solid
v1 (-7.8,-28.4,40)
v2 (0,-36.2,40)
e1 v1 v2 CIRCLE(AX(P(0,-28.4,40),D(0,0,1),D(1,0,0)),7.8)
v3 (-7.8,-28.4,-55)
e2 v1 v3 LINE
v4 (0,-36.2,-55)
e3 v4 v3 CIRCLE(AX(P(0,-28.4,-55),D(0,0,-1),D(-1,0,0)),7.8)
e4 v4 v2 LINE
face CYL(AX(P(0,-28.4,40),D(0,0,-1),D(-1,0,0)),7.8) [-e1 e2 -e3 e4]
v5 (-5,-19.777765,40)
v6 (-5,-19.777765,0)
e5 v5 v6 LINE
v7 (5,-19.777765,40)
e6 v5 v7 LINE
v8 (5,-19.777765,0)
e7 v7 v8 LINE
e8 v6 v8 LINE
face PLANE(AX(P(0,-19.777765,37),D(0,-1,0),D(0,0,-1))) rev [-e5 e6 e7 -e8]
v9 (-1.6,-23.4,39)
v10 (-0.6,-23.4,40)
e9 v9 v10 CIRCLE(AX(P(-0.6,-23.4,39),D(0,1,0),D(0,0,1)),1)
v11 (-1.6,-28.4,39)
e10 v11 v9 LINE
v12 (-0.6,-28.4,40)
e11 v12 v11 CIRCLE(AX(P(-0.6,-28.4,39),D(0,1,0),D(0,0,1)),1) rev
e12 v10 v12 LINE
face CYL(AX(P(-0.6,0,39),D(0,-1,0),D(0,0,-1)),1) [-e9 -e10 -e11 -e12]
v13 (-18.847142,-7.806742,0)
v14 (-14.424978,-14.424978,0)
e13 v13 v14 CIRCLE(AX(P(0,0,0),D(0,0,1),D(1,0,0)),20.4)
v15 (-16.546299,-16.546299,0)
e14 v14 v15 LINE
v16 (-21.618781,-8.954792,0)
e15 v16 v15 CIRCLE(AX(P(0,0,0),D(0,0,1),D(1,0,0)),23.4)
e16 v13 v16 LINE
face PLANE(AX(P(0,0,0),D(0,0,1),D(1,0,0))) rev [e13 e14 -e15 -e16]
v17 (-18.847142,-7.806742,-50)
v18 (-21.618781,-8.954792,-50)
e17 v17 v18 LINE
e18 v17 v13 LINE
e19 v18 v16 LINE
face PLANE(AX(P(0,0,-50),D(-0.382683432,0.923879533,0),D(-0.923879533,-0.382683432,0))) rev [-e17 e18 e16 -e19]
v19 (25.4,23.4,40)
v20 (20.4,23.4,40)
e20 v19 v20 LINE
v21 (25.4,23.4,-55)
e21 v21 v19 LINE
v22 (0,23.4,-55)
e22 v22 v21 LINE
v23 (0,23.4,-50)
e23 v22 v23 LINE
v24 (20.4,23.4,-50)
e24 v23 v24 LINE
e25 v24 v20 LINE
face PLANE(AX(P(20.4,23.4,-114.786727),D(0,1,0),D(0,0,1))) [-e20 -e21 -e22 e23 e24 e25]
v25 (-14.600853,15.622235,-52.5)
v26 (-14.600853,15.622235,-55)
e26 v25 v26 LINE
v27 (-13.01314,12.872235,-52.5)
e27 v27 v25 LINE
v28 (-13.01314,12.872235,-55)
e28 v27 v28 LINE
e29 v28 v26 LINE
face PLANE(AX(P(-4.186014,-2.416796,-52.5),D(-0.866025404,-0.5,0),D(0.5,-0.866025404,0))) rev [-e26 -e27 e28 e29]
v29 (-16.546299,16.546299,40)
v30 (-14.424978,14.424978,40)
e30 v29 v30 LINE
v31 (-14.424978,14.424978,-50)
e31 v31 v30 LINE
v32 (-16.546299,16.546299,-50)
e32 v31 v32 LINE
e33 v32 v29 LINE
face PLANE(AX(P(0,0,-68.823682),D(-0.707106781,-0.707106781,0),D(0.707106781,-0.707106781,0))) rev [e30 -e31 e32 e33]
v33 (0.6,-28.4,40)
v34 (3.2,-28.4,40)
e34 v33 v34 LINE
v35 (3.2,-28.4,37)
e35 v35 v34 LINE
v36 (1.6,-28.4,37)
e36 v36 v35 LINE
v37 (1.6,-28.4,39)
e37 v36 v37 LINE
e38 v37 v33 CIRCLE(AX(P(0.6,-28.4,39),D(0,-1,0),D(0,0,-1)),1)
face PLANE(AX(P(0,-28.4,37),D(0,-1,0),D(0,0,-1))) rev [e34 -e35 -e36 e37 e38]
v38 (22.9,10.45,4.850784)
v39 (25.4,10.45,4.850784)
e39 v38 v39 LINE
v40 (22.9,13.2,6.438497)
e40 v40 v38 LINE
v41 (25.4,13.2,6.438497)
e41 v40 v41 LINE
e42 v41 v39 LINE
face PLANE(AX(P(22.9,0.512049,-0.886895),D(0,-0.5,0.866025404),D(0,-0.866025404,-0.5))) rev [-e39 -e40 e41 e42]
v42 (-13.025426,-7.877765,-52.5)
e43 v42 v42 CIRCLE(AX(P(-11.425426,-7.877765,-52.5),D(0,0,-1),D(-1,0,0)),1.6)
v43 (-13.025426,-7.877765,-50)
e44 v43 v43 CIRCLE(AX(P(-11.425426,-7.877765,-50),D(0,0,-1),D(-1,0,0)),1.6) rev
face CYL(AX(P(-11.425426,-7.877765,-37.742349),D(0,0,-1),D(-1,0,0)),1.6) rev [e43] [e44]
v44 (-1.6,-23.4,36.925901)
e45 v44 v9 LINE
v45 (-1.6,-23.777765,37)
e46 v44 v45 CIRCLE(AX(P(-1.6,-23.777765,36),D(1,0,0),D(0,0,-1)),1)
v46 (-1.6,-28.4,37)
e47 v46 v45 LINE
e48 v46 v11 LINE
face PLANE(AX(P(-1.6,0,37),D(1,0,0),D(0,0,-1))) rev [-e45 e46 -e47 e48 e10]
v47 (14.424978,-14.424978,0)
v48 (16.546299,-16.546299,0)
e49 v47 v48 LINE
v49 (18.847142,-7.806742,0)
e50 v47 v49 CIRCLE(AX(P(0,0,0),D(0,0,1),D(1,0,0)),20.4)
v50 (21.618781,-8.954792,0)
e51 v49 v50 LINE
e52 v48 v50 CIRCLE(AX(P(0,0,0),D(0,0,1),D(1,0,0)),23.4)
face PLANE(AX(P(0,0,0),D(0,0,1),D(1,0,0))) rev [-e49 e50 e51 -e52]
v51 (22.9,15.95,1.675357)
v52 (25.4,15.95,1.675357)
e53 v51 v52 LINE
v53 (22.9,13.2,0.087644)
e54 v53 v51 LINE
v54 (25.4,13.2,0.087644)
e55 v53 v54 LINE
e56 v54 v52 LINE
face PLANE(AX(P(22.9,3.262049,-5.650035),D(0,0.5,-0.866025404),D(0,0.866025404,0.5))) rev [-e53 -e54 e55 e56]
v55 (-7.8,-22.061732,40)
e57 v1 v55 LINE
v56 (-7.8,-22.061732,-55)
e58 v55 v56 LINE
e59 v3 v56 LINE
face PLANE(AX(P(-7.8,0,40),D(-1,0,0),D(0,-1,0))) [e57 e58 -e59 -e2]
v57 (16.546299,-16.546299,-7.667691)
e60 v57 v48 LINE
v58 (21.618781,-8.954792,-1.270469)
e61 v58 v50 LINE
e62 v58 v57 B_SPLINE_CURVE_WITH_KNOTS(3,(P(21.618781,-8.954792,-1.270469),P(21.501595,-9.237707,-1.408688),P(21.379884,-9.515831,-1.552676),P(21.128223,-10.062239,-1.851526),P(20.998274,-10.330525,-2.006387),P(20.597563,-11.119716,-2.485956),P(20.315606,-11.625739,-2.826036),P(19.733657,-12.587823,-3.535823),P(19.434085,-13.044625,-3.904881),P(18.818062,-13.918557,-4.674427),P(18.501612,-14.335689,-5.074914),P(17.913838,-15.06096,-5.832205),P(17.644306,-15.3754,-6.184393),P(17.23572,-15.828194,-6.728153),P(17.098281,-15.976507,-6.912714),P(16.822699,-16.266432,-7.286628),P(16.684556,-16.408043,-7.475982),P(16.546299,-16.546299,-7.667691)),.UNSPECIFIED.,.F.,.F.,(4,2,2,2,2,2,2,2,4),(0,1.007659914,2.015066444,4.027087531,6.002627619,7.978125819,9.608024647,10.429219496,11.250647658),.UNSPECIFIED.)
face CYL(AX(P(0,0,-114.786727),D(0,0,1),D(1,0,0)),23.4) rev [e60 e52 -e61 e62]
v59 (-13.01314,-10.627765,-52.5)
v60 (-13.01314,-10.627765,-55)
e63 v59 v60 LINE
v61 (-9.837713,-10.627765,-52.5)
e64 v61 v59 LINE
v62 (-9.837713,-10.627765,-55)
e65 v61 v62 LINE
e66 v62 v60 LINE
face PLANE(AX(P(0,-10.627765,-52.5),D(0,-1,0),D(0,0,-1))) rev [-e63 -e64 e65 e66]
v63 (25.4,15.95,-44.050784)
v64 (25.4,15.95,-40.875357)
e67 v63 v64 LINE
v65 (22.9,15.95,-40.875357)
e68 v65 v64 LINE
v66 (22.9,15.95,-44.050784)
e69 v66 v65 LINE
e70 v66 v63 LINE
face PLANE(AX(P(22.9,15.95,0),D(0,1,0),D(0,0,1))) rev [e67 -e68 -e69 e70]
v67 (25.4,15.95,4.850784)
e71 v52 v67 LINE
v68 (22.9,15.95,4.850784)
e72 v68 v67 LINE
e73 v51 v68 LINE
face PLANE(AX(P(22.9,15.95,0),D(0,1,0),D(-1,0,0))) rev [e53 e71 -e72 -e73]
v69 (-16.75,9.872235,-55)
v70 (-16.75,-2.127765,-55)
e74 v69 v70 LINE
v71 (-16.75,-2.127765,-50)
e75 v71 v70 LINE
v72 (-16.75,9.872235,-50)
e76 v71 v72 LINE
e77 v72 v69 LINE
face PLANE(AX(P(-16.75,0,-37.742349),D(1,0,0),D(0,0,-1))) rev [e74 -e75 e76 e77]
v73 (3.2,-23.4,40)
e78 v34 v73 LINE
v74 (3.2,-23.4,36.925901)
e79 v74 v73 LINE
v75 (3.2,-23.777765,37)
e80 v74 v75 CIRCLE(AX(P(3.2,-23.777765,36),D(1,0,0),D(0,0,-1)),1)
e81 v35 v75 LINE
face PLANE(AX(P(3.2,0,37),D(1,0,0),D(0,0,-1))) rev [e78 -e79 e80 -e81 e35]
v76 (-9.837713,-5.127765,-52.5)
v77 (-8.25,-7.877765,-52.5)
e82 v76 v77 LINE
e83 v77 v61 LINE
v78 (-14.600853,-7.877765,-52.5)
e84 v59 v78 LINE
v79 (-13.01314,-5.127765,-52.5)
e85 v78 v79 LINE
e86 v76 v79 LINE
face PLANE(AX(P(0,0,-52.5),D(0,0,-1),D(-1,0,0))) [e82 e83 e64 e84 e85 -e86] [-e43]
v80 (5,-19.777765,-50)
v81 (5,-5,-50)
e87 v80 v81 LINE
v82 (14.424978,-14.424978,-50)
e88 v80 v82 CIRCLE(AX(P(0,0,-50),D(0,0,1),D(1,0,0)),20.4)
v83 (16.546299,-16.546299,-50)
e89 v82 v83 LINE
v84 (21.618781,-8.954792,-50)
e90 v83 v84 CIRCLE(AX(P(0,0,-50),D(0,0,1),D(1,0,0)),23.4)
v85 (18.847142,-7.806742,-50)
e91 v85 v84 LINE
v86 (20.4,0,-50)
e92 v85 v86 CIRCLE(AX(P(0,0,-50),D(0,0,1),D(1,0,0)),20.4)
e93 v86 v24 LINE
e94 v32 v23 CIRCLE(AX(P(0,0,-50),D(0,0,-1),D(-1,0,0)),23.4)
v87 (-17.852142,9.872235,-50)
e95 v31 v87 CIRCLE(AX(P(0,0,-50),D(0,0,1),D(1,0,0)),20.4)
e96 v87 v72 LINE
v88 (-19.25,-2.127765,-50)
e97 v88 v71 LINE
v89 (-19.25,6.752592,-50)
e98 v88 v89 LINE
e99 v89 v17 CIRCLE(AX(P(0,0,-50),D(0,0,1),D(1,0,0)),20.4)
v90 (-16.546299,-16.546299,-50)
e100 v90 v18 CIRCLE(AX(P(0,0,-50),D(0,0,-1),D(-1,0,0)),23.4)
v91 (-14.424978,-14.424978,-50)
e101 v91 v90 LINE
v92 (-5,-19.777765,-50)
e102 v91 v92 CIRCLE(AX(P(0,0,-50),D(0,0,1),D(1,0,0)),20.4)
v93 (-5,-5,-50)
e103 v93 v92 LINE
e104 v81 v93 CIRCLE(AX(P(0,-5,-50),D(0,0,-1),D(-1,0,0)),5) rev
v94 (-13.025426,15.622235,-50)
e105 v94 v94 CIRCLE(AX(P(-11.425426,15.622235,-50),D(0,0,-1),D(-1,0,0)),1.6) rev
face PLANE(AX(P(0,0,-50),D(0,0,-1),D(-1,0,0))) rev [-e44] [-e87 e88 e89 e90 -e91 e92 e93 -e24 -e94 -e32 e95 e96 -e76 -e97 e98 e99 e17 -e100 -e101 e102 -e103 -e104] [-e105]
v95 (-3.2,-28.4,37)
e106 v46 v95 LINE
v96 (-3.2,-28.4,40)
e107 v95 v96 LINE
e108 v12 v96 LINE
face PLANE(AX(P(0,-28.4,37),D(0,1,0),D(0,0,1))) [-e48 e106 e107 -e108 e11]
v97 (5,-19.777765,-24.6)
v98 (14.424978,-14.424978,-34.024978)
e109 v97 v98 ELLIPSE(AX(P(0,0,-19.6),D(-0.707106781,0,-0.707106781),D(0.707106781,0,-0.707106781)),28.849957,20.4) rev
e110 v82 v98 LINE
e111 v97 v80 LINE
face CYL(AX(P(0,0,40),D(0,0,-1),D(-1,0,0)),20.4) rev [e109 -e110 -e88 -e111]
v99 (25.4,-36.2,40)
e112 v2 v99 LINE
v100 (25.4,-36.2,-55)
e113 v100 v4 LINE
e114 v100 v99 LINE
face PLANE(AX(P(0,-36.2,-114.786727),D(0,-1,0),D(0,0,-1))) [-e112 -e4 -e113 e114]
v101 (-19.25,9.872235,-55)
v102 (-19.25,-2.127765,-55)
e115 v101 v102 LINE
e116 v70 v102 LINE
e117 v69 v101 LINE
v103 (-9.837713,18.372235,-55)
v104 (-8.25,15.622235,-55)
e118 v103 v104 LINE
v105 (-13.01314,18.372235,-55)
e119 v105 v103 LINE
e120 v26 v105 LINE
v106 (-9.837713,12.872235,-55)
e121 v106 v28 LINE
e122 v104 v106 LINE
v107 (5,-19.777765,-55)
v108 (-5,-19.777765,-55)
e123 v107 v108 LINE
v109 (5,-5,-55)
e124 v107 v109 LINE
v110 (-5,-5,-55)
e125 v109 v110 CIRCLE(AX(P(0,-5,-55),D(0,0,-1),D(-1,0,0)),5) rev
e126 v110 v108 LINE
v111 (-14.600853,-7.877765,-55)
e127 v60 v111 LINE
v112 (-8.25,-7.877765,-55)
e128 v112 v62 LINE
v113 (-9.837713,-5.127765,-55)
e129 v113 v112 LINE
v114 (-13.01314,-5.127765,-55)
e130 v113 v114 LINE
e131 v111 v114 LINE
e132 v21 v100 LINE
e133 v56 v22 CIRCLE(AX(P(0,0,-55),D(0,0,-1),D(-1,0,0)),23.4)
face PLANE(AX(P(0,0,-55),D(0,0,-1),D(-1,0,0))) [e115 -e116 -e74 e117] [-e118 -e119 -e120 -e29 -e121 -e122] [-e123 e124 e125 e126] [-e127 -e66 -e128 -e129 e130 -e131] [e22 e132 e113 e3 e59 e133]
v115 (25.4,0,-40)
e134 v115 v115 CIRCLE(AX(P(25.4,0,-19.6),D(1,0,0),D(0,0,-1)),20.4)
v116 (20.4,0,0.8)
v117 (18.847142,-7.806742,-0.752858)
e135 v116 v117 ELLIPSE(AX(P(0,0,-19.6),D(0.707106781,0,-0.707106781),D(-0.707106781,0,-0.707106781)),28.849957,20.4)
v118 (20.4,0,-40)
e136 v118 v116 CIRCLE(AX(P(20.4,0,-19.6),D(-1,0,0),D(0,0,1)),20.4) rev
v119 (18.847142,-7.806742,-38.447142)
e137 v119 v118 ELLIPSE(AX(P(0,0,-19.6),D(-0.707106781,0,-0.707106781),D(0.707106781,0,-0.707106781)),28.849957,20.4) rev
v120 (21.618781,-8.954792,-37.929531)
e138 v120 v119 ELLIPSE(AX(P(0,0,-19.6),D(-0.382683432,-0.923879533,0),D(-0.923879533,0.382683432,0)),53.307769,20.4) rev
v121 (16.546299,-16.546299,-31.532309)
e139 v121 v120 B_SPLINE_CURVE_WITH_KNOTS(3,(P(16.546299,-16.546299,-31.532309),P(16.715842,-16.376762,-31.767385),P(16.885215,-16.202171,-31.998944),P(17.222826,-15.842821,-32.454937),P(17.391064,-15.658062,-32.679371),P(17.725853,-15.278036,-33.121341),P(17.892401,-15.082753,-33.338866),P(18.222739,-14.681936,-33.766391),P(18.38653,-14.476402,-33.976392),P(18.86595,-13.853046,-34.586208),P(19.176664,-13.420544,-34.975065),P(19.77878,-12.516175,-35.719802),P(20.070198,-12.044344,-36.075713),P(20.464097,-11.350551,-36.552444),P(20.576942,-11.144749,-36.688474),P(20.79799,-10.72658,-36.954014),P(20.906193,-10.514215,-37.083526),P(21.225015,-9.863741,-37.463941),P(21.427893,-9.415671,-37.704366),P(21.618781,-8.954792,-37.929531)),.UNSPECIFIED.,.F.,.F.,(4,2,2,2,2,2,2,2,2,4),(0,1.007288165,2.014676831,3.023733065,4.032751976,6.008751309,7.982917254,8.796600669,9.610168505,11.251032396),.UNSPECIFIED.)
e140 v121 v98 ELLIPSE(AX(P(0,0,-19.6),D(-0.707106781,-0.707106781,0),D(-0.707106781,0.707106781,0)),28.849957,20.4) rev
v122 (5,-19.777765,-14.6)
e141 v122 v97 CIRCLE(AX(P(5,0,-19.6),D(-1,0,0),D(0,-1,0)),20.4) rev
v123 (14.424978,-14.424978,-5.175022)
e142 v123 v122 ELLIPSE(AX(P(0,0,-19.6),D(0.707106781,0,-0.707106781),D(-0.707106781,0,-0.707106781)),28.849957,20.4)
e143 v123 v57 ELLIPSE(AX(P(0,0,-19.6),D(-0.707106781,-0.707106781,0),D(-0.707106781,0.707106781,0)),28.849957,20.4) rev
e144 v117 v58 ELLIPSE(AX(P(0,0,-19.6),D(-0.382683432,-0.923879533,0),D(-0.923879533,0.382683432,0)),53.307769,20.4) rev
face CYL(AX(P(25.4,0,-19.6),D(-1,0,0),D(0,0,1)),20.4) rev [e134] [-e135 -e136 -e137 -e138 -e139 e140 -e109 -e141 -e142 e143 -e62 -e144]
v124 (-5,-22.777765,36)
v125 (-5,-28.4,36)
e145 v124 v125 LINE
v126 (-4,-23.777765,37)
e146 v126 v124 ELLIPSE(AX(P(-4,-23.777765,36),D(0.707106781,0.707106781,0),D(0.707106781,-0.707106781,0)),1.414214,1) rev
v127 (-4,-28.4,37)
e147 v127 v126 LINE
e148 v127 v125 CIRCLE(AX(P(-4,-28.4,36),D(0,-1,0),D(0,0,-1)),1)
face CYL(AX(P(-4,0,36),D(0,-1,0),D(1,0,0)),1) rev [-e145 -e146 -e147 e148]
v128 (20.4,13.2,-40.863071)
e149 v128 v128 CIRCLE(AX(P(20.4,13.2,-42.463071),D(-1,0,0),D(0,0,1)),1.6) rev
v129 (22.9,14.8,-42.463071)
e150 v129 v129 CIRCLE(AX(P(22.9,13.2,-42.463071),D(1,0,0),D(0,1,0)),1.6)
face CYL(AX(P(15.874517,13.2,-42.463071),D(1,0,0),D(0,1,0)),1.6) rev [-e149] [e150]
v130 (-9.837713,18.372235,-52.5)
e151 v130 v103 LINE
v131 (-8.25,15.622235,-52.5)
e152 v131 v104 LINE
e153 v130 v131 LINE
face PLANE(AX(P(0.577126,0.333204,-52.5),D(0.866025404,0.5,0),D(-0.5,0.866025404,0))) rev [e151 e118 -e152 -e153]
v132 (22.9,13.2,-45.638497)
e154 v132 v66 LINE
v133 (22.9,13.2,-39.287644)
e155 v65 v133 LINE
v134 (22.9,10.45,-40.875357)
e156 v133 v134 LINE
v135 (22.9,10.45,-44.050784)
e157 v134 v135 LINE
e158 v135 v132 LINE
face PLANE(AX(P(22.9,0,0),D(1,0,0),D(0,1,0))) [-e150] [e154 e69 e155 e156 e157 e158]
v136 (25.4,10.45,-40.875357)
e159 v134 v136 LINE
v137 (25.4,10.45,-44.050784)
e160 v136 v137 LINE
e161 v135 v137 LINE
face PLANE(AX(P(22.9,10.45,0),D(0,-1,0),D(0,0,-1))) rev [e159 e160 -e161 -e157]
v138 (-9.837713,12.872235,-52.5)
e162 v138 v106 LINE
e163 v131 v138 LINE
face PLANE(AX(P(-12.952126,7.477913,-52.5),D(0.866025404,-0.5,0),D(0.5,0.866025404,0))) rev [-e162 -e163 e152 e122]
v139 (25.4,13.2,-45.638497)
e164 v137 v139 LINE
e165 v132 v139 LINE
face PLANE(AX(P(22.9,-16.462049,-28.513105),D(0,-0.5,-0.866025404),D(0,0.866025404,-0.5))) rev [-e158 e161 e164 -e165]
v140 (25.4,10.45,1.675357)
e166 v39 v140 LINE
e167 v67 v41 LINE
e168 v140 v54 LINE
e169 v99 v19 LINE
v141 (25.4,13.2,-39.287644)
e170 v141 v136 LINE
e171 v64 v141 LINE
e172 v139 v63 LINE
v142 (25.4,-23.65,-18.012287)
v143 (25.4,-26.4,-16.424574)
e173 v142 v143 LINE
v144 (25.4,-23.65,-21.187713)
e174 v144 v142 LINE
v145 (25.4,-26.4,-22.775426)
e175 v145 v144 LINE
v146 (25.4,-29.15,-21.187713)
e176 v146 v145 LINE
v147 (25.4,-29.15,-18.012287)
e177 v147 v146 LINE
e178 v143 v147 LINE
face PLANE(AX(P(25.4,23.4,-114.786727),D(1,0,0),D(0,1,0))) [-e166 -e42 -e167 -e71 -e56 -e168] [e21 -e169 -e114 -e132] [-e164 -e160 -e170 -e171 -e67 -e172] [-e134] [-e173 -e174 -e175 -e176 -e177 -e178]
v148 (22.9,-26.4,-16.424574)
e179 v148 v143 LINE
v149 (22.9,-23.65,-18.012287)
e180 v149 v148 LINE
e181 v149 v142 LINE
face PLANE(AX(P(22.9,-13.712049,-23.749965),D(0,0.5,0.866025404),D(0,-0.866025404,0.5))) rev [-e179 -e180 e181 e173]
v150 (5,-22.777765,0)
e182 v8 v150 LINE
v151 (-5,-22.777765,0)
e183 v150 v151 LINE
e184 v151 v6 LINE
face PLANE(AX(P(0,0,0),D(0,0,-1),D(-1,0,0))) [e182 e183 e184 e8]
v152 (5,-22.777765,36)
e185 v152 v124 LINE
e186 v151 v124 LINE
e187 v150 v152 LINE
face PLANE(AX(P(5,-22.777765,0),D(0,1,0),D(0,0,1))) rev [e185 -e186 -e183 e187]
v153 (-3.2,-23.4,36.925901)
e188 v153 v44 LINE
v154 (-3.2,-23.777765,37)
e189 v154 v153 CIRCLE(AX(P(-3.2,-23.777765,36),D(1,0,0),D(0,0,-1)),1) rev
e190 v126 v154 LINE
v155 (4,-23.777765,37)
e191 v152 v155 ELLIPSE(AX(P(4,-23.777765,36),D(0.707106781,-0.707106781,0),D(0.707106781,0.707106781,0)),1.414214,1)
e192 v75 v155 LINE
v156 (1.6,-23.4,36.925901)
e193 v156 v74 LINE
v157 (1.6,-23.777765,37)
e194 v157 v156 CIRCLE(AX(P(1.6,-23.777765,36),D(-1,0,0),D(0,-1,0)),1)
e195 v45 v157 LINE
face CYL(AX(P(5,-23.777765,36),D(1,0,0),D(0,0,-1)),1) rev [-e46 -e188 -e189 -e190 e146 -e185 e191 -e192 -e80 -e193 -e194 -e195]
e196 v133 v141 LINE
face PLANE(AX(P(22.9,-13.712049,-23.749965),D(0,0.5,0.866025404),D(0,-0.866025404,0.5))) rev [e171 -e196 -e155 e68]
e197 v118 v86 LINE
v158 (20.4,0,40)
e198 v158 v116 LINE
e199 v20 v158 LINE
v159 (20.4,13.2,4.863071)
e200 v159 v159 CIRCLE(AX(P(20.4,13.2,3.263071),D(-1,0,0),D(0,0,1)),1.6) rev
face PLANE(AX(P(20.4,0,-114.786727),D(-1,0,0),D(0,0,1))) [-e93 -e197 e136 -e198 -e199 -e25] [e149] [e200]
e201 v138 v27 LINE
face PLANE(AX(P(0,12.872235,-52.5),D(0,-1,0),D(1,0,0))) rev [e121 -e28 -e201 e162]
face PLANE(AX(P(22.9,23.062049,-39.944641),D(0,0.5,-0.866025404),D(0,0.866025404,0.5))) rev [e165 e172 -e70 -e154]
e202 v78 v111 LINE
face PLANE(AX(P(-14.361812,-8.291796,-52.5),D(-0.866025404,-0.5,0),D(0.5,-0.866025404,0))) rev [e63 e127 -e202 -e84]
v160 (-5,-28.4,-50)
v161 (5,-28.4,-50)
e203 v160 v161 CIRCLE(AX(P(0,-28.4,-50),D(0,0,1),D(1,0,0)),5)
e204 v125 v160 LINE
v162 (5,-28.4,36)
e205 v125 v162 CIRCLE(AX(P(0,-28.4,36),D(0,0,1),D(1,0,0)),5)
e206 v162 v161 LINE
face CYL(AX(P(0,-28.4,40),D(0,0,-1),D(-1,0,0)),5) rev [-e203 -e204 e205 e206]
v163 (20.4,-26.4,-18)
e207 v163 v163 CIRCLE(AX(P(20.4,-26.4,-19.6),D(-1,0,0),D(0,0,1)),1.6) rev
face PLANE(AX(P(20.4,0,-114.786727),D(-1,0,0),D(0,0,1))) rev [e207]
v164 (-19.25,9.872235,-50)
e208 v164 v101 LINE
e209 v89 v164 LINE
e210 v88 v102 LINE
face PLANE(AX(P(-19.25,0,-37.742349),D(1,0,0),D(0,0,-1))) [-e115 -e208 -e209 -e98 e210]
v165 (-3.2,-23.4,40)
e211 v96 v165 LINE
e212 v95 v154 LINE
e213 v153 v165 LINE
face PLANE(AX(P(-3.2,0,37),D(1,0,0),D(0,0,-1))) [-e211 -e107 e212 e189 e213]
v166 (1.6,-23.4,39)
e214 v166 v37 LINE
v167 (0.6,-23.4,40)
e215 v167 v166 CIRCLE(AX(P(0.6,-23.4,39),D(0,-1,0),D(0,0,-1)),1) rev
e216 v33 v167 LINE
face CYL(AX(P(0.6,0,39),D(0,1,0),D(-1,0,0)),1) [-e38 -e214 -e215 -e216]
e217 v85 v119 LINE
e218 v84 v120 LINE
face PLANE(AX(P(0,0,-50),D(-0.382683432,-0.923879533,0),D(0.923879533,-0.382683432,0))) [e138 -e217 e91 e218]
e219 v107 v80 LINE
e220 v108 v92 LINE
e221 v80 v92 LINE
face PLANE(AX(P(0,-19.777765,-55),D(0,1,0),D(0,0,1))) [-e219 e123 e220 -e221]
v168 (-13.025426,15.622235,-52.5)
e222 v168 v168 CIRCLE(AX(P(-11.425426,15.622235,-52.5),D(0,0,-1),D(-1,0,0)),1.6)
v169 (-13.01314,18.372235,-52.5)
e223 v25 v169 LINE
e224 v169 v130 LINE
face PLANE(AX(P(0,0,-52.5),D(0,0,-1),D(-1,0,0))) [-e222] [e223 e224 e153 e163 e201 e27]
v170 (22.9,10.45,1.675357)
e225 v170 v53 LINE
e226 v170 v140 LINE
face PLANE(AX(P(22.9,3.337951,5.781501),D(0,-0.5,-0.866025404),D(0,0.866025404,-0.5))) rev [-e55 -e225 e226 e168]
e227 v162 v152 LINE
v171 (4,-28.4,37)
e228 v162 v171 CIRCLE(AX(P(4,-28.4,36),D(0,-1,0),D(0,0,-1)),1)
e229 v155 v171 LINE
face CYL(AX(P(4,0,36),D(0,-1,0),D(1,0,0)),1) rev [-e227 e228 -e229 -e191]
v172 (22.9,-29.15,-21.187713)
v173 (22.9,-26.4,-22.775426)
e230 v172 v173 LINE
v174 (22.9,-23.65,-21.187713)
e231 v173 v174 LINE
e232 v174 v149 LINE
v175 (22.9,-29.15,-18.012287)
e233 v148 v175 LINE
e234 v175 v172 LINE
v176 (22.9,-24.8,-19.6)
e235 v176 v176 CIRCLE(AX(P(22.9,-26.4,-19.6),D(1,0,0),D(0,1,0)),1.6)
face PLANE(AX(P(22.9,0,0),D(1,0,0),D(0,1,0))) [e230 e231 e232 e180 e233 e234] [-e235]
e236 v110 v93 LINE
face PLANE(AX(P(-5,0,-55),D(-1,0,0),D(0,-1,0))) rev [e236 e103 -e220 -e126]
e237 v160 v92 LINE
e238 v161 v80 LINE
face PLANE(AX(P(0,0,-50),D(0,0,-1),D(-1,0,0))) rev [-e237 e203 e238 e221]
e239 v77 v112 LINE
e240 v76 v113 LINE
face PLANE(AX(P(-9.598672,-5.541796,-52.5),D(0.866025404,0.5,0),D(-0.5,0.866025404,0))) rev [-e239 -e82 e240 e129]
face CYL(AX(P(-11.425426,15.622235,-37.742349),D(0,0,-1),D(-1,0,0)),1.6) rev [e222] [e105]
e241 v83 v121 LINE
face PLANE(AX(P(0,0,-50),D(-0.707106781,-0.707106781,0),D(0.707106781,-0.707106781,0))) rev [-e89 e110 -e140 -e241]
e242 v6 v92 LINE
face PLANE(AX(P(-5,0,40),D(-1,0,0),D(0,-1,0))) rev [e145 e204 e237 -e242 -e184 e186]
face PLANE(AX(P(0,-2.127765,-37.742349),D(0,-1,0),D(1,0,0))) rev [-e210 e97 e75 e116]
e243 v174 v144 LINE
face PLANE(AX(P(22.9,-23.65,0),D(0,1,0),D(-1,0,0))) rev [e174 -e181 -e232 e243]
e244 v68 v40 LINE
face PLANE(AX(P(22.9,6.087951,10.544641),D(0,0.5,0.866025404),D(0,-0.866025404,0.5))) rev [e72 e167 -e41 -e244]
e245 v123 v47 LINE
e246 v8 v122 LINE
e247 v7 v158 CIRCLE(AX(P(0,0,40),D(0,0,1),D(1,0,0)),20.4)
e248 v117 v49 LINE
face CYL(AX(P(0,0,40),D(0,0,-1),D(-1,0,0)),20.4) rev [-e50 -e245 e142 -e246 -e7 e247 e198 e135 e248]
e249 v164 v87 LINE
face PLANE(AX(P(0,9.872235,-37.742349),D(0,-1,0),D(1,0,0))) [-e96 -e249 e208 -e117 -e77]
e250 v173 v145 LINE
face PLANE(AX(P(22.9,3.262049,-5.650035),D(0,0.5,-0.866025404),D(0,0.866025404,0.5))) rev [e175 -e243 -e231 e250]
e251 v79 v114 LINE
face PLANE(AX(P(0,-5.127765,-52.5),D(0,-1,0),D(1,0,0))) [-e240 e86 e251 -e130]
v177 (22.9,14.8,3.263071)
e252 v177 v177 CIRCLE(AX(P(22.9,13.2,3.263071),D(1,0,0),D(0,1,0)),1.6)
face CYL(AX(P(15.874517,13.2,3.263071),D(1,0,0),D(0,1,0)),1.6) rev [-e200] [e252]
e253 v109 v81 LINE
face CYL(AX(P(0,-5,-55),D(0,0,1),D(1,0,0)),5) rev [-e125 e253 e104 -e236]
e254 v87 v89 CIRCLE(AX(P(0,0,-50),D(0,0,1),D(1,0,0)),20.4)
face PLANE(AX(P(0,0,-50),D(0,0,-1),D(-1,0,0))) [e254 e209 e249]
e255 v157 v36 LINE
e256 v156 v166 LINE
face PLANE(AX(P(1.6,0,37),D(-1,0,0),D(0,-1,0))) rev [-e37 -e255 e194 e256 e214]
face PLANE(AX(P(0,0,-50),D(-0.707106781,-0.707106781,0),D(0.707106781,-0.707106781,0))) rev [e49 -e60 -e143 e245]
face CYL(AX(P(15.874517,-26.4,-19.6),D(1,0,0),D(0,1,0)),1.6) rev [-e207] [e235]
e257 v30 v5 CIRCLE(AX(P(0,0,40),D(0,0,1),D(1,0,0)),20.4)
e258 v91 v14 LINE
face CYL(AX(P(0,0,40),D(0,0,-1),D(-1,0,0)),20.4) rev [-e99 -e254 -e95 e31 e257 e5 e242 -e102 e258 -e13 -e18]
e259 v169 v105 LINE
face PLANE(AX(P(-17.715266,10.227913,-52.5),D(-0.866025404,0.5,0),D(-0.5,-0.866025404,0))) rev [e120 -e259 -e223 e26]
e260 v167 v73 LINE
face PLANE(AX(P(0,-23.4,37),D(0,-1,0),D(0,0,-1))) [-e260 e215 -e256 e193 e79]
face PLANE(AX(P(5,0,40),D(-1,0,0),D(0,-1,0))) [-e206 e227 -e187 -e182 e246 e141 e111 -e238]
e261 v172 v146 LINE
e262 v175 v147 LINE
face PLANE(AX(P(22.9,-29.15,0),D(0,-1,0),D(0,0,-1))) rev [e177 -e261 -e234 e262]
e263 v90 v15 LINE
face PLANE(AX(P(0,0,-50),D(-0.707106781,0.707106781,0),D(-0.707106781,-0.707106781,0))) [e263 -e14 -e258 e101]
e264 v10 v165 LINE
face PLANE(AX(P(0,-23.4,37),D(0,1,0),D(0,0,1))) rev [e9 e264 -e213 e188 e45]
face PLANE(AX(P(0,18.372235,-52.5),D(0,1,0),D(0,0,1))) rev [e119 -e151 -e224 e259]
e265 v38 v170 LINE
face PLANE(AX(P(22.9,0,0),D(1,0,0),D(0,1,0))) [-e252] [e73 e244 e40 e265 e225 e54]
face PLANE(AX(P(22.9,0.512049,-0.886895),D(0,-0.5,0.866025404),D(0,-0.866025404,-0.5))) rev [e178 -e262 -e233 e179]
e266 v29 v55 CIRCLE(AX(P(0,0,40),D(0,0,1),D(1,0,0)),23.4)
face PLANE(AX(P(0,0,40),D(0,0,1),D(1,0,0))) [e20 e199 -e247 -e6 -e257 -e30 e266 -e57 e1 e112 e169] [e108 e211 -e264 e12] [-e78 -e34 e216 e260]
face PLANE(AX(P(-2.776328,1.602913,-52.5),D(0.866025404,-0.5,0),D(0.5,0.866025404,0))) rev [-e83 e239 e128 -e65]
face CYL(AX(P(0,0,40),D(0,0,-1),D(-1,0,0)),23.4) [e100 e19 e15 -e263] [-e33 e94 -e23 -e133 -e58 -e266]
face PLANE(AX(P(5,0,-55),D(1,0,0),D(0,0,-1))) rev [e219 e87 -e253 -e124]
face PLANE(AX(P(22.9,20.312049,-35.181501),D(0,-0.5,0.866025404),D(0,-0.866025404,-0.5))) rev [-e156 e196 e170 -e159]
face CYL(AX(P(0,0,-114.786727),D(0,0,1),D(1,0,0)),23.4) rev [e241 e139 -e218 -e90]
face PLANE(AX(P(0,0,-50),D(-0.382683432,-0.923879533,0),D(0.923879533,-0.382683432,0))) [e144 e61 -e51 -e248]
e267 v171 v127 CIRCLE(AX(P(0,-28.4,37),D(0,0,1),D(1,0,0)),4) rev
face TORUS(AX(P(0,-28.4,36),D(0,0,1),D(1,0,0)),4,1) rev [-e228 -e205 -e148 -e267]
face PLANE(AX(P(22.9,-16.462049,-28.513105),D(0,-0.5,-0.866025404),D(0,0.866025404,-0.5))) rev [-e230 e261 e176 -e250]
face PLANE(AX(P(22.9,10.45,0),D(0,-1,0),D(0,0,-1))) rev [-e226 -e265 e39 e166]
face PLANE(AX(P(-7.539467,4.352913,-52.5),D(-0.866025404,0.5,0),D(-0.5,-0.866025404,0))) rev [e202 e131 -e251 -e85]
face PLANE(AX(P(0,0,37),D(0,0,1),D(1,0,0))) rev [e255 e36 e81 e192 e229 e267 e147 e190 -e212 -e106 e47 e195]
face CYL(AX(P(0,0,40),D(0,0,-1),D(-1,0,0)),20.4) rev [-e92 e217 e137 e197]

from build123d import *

# Parameters (mm, degrees)
BOSS_EXTRUDE3_DEPTH  = 40
BOSS_EXTRUDE7_START  = -50
BOSS_EXTRUDE7_DEPTH  = 50
BOSS_EXTRUDE8_START  = -3
SKETCH3_W            = 1.6
SKETCH3_H            = 5
BOSS_EXTRUDE8_DEPTH  = 3
SKETCH5_W            = 10
SKETCH5_H            = 3
BOSS_EXTRUDE9_DEPTH  = 37
BOSS_EXTRUDE10_START = -90
BOSS_EXTRUDE10_DEPTH = 90
SKETCH8_R            = 20.4
CUT_EXTRUDE1_DEPTH   = 67.750280898
CUT_EXTRUDE2_DEPTH   = 2.5
SKETCH10_R           = 1.6
CUT_EXTRUDE3_DEPTH   = 2.5
FILLET1_R            = 1
BOSS_EXTRUDE12_START = -50
BOSS_EXTRUDE12_DEPTH = 90
BOSS_EXTRUDE13_START = 5
BOSS_EXTRUDE13_DEPTH = 5
SKETCH12_R           = 1.6
CUT_EXTRUDE4_DEPTH   = 2.5
SKETCH12_4_R         = 1.6
SKETCH12_4_W         = 2.5
SKETCH12_4_H         = 12
CUT_EXTRUDE5_DEPTH   = 5


with BuildPart() as part:
    # Sketch1 → Boss-Extrude3 (new body)
    with BuildSketch(Plane.XY):
        with BuildLine():
            Line((8.954792317, -21.618781061), (7.80674202, -18.847142463))
            ThreePointArc((7.80674202, -18.847142463), (6.420255058, -19.363375868), (5, -19.777765293))
            Line((5, -19.777765293), (5, -28.4))
            ThreePointArc((5, -28.4), (0, -33.4), (-5, -28.4))
            Line((-5, -28.4), (-5, -19.777765293))
            ThreePointArc((-5, -19.777765293), (-6.420255058, -19.363375868), (-7.80674202, -18.847142463))
            Line((-7.80674202, -18.847142463), (-8.954792317, -21.618781061))
            ThreePointArc((-8.954792317, -21.618781061), (-8.380323245, -21.847887365), (-7.8, -22.061731573))
            Line((-7.8, -22.061731573), (-7.8, -28.4))
            ThreePointArc((-7.8, -28.4), (0, -36.2), (7.8, -28.4))
            Line((7.8, -28.4), (7.8, -22.061731573))
            ThreePointArc((7.8, -22.061731573), (8.380323245, -21.847887365), (8.954792317, -21.618781061))
        make_face()
        with BuildLine():
            Line((16.54629868, -16.54629868), (14.424978336, -14.424978336))
            ThreePointArc((14.424978336, -14.424978336), (11.333632754, -16.961980091), (7.80674202, -18.847142463))
            Line((7.80674202, -18.847142463), (8.954792317, -21.618781061))
            ThreePointArc((8.954792317, -21.618781061), (13.000343453, -19.456388928), (16.54629868, -16.54629868))
        make_face()
        with BuildLine():
            ThreePointArc((-7.80674202, -18.847142463), (-11.333632754, -16.961980091), (-14.424978336, -14.424978336))
            Line((-14.424978336, -14.424978336), (-16.54629868, -16.54629868))
            ThreePointArc((-16.54629868, -16.54629868), (-13.000343453, -19.456388928), (-8.954792317, -21.618781061))
            Line((-8.954792317, -21.618781061), (-7.80674202, -18.847142463))
        make_face()
        with BuildLine():
            ThreePointArc((-18.847142463, -7.80674202), (-20.00801972, -3.979842569), (-20.4, 0))
            Line((-20.4, 0), (-23.4, 0))
            ThreePointArc((-23.4, 0), (-22.950375561, -4.565113535), (-21.618781061, -8.954792317))
            Line((-21.618781061, -8.954792317), (-18.847142463, -7.80674202))
        make_face()
        with BuildLine():
            Line((21.618781061, -8.954792317), (18.847142463, -7.80674202))
            ThreePointArc((18.847142463, -7.80674202), (16.961980091, -11.333632754), (14.424978336, -14.424978336))
            Line((14.424978336, -14.424978336), (16.54629868, -16.54629868))
            ThreePointArc((16.54629868, -16.54629868), (19.456388928, -13.000343453), (21.618781061, -8.954792317))
        make_face()
        with BuildLine():
            Line((23.4, 0), (20.4, 0))
            ThreePointArc((20.4, 0), (20.00801972, -3.979842569), (18.847142463, -7.80674202))
            Line((18.847142463, -7.80674202), (21.618781061, -8.954792317))
            ThreePointArc((21.618781061, -8.954792317), (22.950375561, -4.565113535), (23.4, 0))
        make_face()
        with BuildLine():
            ThreePointArc((-14.424978336, -14.424978336), (-16.961980091, -11.333632754), (-18.847142463, -7.80674202))
            Line((-18.847142463, -7.80674202), (-21.618781061, -8.954792317))
            ThreePointArc((-21.618781061, -8.954792317), (-19.456388928, -13.000343453), (-16.54629868, -16.54629868))
            Line((-16.54629868, -16.54629868), (-14.424978336, -14.424978336))
        make_face()
    extrude(amount=BOSS_EXTRUDE3_DEPTH)

    # Sketch1<12> → Boss-Extrude7 (add)
    with BuildSketch(Plane.XY.offset(BOSS_EXTRUDE7_START)):
        with BuildLine():
            Line((16.54629868, -16.54629868), (14.424978336, -14.424978336))
            ThreePointArc((14.424978336, -14.424978336), (11.333632754, -16.961980091), (7.80674202, -18.847142463))
            Line((7.80674202, -18.847142463), (8.954792317, -21.618781061))
            ThreePointArc((8.954792317, -21.618781061), (13.000343453, -19.456388928), (16.54629868, -16.54629868))
        make_face()
        with BuildLine():
            Line((8.954792317, -21.618781061), (7.80674202, -18.847142463))
            ThreePointArc((7.80674202, -18.847142463), (6.420255058, -19.363375868), (5, -19.777765293))
            Line((5, -19.777765293), (5, -28.4))
            ThreePointArc((5, -28.4), (0, -33.4), (-5, -28.4))
            Line((-5, -28.4), (-5, -19.777765293))
            ThreePointArc((-5, -19.777765293), (-6.420255058, -19.363375868), (-7.80674202, -18.847142463))
            Line((-7.80674202, -18.847142463), (-8.954792317, -21.618781061))
            ThreePointArc((-8.954792317, -21.618781061), (-8.380323245, -21.847887365), (-7.8, -22.061731573))
            Line((-7.8, -22.061731573), (-7.8, -28.4))
            ThreePointArc((-7.8, -28.4), (0, -36.2), (7.8, -28.4))
            Line((7.8, -28.4), (7.8, -22.061731573))
            ThreePointArc((7.8, -22.061731573), (8.380323245, -21.847887365), (8.954792317, -21.618781061))
        make_face()
        with BuildLine():
            ThreePointArc((-18.847142463, -7.80674202), (-20.00801972, -3.979842569), (-20.4, 0))
            Line((-20.4, 0), (-23.4, 0))
            ThreePointArc((-23.4, 0), (-22.950375561, -4.565113535), (-21.618781061, -8.954792317))
            Line((-21.618781061, -8.954792317), (-18.847142463, -7.80674202))
        make_face()
        with BuildLine():
            Line((23.4, 0), (20.4, 0))
            ThreePointArc((20.4, 0), (20.00801972, -3.979842569), (18.847142463, -7.80674202))
            Line((18.847142463, -7.80674202), (21.618781061, -8.954792317))
            ThreePointArc((21.618781061, -8.954792317), (22.950375561, -4.565113535), (23.4, 0))
        make_face()
        with BuildLine():
            ThreePointArc((-7.80674202, -18.847142463), (-11.333632754, -16.961980091), (-14.424978336, -14.424978336))
            Line((-14.424978336, -14.424978336), (-16.54629868, -16.54629868))
            ThreePointArc((-16.54629868, -16.54629868), (-13.000343453, -19.456388928), (-8.954792317, -21.618781061))
            Line((-8.954792317, -21.618781061), (-7.80674202, -18.847142463))
        make_face()
    extrude(amount=BOSS_EXTRUDE7_DEPTH)

    # Sketch3 → Boss-Extrude8 (add)
    with BuildSketch(Plane.XY.offset(40).offset(BOSS_EXTRUDE8_START)):
        with BuildLine():
            Line((-5, -19.777765293), (5, -19.777765293))
            Line((5, -19.777765293), (5, -28.4))
            ThreePointArc((5, -28.4), (0, -33.4), (-5, -28.4))
            Line((-5, -28.4), (-5, -19.777765293))
        make_face()
        with Locations((2.4, -25.9)):
            Rectangle(SKETCH3_W, SKETCH3_H, mode=Mode.SUBTRACT)
        with Locations((-2.4, -25.9)):
            Rectangle(SKETCH3_W, SKETCH3_H, mode=Mode.SUBTRACT)
    extrude(amount=BOSS_EXTRUDE8_DEPTH)

    # Sketch5 → Boss-Extrude9 (add)
    with BuildSketch(Plane(origin=(0, 0, 37), x_dir=(-1, 0, 0), z_dir=(0, 0, -1))):
        with Locations((0, -21.277765293)):
            Rectangle(SKETCH5_W, SKETCH5_H)
    extrude(amount=BOSS_EXTRUDE9_DEPTH)

    # Sketch6 → Boss-Extrude10 (add)
    with BuildSketch(Plane.XY.offset(40).offset(BOSS_EXTRUDE10_START)):
        with BuildLine():
            Line((20.4, 0), (20.4, 23.4))
            Line((20.4, 23.4), (25.4, 23.4))
            Line((25.4, 23.4), (25.4, -36.2))
            Line((25.4, -36.2), (0, -36.2))
            ThreePointArc((0, -36.2), (5.515432893, -33.915432893), (7.8, -28.4))
            Line((7.8, -28.4), (7.8, -22.061731573))
            ThreePointArc((7.8, -22.061731573), (19.106019994, -13.509996299), (23.4, 0))
            Line((23.4, 0), (20.4, 0))
        make_face()
    extrude(amount=BOSS_EXTRUDE10_DEPTH)

    # Sketch8 → Cut-Extrude1 (cut, through all)
    with BuildSketch(Plane(origin=(0, 0, 0), x_dir=(0, 0, -1), z_dir=(1, 0, 0))):
        with Locations((19.6, 0)):
            Circle(SKETCH8_R)
    extrude(amount=CUT_EXTRUDE1_DEPTH, mode=Mode.SUBTRACT)

    # Sketch9 → Cut-Extrude2 (cut)
    with BuildSketch(Plane(origin=(25.4, 0, 0), x_dir=(0, 0, -1), z_dir=(1, 0, 0))):
        Polygon((18.01228676, -29.15), (21.18771324, -29.15), (22.775426481, -26.4), (21.18771324, -23.65), (18.01228676, -23.65), (16.424573519, -26.4), align=None)
        Polygon((-4.8507839, 10.45), (-1.67535742, 10.45), (-0.087644179, 13.2), (-1.67535742, 15.95), (-4.8507839, 15.95), (-6.43849714, 13.2), align=None)
        Polygon((40.87535742, 15.95), (39.287644179, 13.2), (40.87535742, 10.45), (44.0507839, 10.45), (45.63849714, 13.2), (44.0507839, 15.95), align=None)
    extrude(amount=-CUT_EXTRUDE2_DEPTH, mode=Mode.SUBTRACT)

    # Sketch10 → Cut-Extrude3 (cut)
    with BuildSketch(Plane(origin=(22.9, 0, 0), x_dir=(0, 0, -1), z_dir=(1, 0, 0))):
        with BuildLine():
            ThreePointArc((21.2, -26.4), (20.73137085, -25.26862915), (19.6, -24.8))
            Line((19.6, -24.8), (19.6, -28))
            ThreePointArc((19.6, -28), (20.73137085, -27.53137085), (21.2, -26.4))
        make_face()
        with BuildLine():
            Line((19.6, -28), (19.6, -24.8))
            ThreePointArc((19.6, -24.8), (18, -26.4), (19.6, -28))
        make_face()
        with Locations(Location((-3.26307066, 13.2, 0), (0, 0, 90))):
            Circle(SKETCH10_R)
        with Locations(Location((42.46307066, 13.2, 0), (0, 0, 90))):
            Circle(SKETCH10_R)
    extrude(amount=-CUT_EXTRUDE3_DEPTH, mode=Mode.SUBTRACT)

    # Fillet1
    # the kernel refuses this fillet: 1 mm, written as the material it adds along each edge
    with BuildSketch(Plane(origin=(-7.5, -22.777765293, 37), x_dir=(0, 0, -1), z_dir=(1, 0, 0))) as fillet1_piece_1_section:
        with BuildLine():
            CenterArc((FILLET1_R, -FILLET1_R), FILLET1_R, 90, 90)
            Line((0, -FILLET1_R), (0, 0))
            Line((0, 0), (FILLET1_R, 0))
        make_face()
    fillet1_piece_1 = extrude(amount=15, mode=Mode.PRIVATE)
    fillet1_piece_1 = split(fillet1_piece_1, bisect_by=Plane(origin=(-4.1, -23.4, 36.767628844), z_dir=(0, 1, 0)), keep=Keep.TOP, mode=Mode.PRIVATE)
    add(fillet1_piece_1)
    with BuildSketch(Plane(origin=(-7.5, -22.777765293, 37), x_dir=(0, 0, -1), z_dir=(1, 0, 0))) as fillet1_piece_2_section:
        with BuildLine():
            CenterArc((FILLET1_R, -FILLET1_R), FILLET1_R, 90, 90)
            Line((0, -FILLET1_R), (0, 0))
            Line((0, 0), (FILLET1_R, 0))
        make_face()
    fillet1_piece_2 = extrude(amount=15, mode=Mode.PRIVATE)
    fillet1_piece_2 = split(fillet1_piece_2, bisect_by=Plane(origin=(-3.2, -23.493727337, 36.977919101), z_dir=(-1, 0, 0)), keep=Keep.TOP, mode=Mode.PRIVATE)
    add(fillet1_piece_2)
    with BuildSketch(Plane(origin=(-7.5, -22.777765293, 37), x_dir=(0, 0, -1), z_dir=(1, 0, 0))) as fillet1_piece_3_section:
        with BuildLine():
            CenterArc((FILLET1_R, -FILLET1_R), FILLET1_R, 90, 90)
            Line((0, -FILLET1_R), (0, 0))
            Line((0, 0), (FILLET1_R, 0))
        make_face()
    fillet1_piece_3 = extrude(amount=15, mode=Mode.PRIVATE)
    fillet1_piece_3 = split(fillet1_piece_3, bisect_by=Plane(origin=(-1.6, -23.493727337, 36.977919101), z_dir=(1, 0, 0)), keep=Keep.TOP, mode=Mode.PRIVATE)
    fillet1_piece_3 = split(fillet1_piece_3, bisect_by=Plane(origin=(1.6, -23.493727337, 36.977919101), z_dir=(-1, 0, 0)), keep=Keep.TOP, mode=Mode.PRIVATE)
    add(fillet1_piece_3)
    with BuildSketch(Plane(origin=(-7.5, -22.777765293, 37), x_dir=(0, 0, -1), z_dir=(1, 0, 0))) as fillet1_piece_4_section:
        with BuildLine():
            CenterArc((FILLET1_R, -FILLET1_R), FILLET1_R, 90, 90)
            Line((0, -FILLET1_R), (0, 0))
            Line((0, 0), (FILLET1_R, 0))
        make_face()
    fillet1_piece_4 = extrude(amount=15, mode=Mode.PRIVATE)
    fillet1_piece_4 = split(fillet1_piece_4, bisect_by=Plane(origin=(3.2, -23.493727337, 36.977919101), z_dir=(1, 0, 0)), keep=Keep.TOP, mode=Mode.PRIVATE)
    add(fillet1_piece_4)
    with BuildSketch(Plane(origin=(-5, -28.4, 37), x_dir=(0, 0, -1), z_dir=(0, 1, 0)), Plane(origin=(5, -20.277765293, 37), x_dir=(0, 0, -1), z_dir=(0, -1, 0))) as fillet1_piece_5:
        with BuildLine():
            CenterArc((FILLET1_R, -FILLET1_R), FILLET1_R, 90, 90)
            Line((0, -FILLET1_R), (0, 0))
            Line((0, 0), (FILLET1_R, 0))
        make_face()
    extrude(amount=8.122234707)
    with BuildSketch(Plane(origin=(0, -28.4, 37), x_dir=(1, 0, 0), z_dir=(0, 1, 0))) as fillet1_piece_6:
        with BuildLine():
            CenterArc((5 - FILLET1_R, FILLET1_R), FILLET1_R, 270, 90)
            Line((5 - FILLET1_R, 0), (5, 0))
            Line((5, 0), (5, FILLET1_R))
        make_face()
    revolve(axis=Axis((0, -28.4, 37), (0, 0, -1)), revolution_arc=180)
    # the kernel refuses this fillet: 1 mm, written as the material it takes off along each edge
    with BuildSketch(Plane(origin=(1.6, -23.4, 40), x_dir=(-1, 0, 0), z_dir=(0, -1, 0))) as fillet1_2_piece_1:
        with BuildLine():
            CenterArc((FILLET1_R, FILLET1_R), FILLET1_R, 180, 90)
            Line((0, FILLET1_R), (0, 0))
            Line((0, 0), (FILLET1_R, 0))
        make_face()
    extrude(amount=5, mode=Mode.SUBTRACT)
    with BuildSketch(Plane(origin=(-1.6, -23.4, 40), x_dir=(1, 0, 0), z_dir=(0, -1, 0))) as fillet1_2_piece_2:
        with BuildLine():
            CenterArc((FILLET1_R, -FILLET1_R), FILLET1_R, 90, 90)
            Line((0, -FILLET1_R), (0, 0))
            Line((0, 0), (FILLET1_R, 0))
        make_face()
    extrude(amount=5, mode=Mode.SUBTRACT)

    # Sketch1<13> → Boss-Extrude12 (add)
    with BuildSketch(Plane.XY.offset(BOSS_EXTRUDE12_START)):
        with BuildLine():
            ThreePointArc((-20.4, 0), (-20.00801972, 3.979842569), (-18.847142463, 7.80674202))
            Line((-18.847142463, 7.80674202), (-21.618781061, 8.954792317))
            ThreePointArc((-21.618781061, 8.954792317), (-22.950375561, 4.565113535), (-23.4, 0))
            Line((-23.4, 0), (-20.4, 0))
        make_face()
        with BuildLine():
            ThreePointArc((-18.847142463, 7.80674202), (-16.961980091, 11.333632754), (-14.424978336, 14.424978336))
            Line((-14.424978336, 14.424978336), (-16.54629868, 16.54629868))
            ThreePointArc((-16.54629868, 16.54629868), (-19.456388928, 13.000343453), (-21.618781061, 8.954792317))
            Line((-21.618781061, 8.954792317), (-18.847142463, 7.80674202))
        make_face()
    extrude(amount=BOSS_EXTRUDE12_DEPTH)

    # Sketch11 → Boss-Extrude13 (add)
    with BuildSketch(Plane(origin=(0, 0, -50), x_dir=(-1, 0, 0), z_dir=(0, 0, -1)).offset(BOSS_EXTRUDE13_START)):
        with BuildLine():
            ThreePointArc((7.8, -22.061731573), (23.063006296, 3.956986302), (0, 23.4))
            Line((0, 23.4), (-25.4, 23.4))
            Line((-25.4, 23.4), (-25.4, -36.2))
            Line((-25.4, -36.2), (0, -36.2))
            ThreePointArc((0, -36.2), (5.515432893, -33.915432893), (7.8, -28.4))
            Line((7.8, -28.4), (7.8, -22.061731573))
        make_face()
        with BuildLine():
            ThreePointArc((-5, -5), (0, 0), (5, -5))
            Line((5, -5), (5, -19.777765293))
            Line((5, -19.777765293), (-5, -19.777765293))
            Line((-5, -19.777765293), (-5, -5))
        make_face(mode=Mode.SUBTRACT)
    extrude(amount=-BOSS_EXTRUDE13_DEPTH)

    # Sketch12 → Cut-Extrude4 (cut)
    # profile 1 of 4: a face of its own
    with BuildSketch(Plane(origin=(0, 0, -55), x_dir=(-1, 0, 0), z_dir=(0, 0, -1))):
        Polygon((8.25, 15.622234707), (9.83771324, 12.872234707), (13.013139721, 12.872234707), (14.600852961, 15.622234707), (13.013139721, 18.372234707), (9.83771324, 18.372234707), align=None)
        with Locations((11.425426481, 15.622234707)):
            Circle(SKETCH12_R, mode=Mode.SUBTRACT)
    # profile 2 of 4: a face of its own
    with BuildSketch(Plane(origin=(0, 0, -55), x_dir=(-1, 0, 0), z_dir=(0, 0, -1))):
        with Locations((11.425426481, 15.622234707)):
            Circle(SKETCH12_R)
    # profile 3 of 4: a face of its own
    with BuildSketch(Plane(origin=(0, 0, -55), x_dir=(-1, 0, 0), z_dir=(0, 0, -1))):
        Polygon((14.600852961, -7.877765293), (13.013139721, -5.127765293), (9.83771324, -5.127765293), (8.25, -7.877765293), (9.83771324, -10.627765293), (13.013139721, -10.627765293), align=None)
        with Locations((11.425426481, -7.877765293)):
            Circle(SKETCH12_R, mode=Mode.SUBTRACT)
    # profile 4 of 4: a face of its own
    with BuildSketch(Plane(origin=(0, 0, -55), x_dir=(-1, 0, 0), z_dir=(0, 0, -1))):
        with Locations((11.425426481, -7.877765293)):
            Circle(SKETCH12_R)
    extrude(amount=-CUT_EXTRUDE4_DEPTH, mode=Mode.SUBTRACT)

    # Sketch12<4> → Cut-Extrude5 (cut)
    with BuildSketch(Plane(origin=(0, 0, -55), x_dir=(-1, 0, 0), z_dir=(0, 0, -1))):
        with Locations((11.425426481, 15.622234707)):
            Circle(SKETCH12_4_R)
        with Locations((11.425426481, -7.877765293)):
            Circle(SKETCH12_4_R)
        with Locations((18, 3.872234707)):
            Rectangle(SKETCH12_4_W, SKETCH12_4_H)
    extrude(amount=-CUT_EXTRUDE5_DEPTH, mode=Mode.SUBTRACT)


solid = part.part
